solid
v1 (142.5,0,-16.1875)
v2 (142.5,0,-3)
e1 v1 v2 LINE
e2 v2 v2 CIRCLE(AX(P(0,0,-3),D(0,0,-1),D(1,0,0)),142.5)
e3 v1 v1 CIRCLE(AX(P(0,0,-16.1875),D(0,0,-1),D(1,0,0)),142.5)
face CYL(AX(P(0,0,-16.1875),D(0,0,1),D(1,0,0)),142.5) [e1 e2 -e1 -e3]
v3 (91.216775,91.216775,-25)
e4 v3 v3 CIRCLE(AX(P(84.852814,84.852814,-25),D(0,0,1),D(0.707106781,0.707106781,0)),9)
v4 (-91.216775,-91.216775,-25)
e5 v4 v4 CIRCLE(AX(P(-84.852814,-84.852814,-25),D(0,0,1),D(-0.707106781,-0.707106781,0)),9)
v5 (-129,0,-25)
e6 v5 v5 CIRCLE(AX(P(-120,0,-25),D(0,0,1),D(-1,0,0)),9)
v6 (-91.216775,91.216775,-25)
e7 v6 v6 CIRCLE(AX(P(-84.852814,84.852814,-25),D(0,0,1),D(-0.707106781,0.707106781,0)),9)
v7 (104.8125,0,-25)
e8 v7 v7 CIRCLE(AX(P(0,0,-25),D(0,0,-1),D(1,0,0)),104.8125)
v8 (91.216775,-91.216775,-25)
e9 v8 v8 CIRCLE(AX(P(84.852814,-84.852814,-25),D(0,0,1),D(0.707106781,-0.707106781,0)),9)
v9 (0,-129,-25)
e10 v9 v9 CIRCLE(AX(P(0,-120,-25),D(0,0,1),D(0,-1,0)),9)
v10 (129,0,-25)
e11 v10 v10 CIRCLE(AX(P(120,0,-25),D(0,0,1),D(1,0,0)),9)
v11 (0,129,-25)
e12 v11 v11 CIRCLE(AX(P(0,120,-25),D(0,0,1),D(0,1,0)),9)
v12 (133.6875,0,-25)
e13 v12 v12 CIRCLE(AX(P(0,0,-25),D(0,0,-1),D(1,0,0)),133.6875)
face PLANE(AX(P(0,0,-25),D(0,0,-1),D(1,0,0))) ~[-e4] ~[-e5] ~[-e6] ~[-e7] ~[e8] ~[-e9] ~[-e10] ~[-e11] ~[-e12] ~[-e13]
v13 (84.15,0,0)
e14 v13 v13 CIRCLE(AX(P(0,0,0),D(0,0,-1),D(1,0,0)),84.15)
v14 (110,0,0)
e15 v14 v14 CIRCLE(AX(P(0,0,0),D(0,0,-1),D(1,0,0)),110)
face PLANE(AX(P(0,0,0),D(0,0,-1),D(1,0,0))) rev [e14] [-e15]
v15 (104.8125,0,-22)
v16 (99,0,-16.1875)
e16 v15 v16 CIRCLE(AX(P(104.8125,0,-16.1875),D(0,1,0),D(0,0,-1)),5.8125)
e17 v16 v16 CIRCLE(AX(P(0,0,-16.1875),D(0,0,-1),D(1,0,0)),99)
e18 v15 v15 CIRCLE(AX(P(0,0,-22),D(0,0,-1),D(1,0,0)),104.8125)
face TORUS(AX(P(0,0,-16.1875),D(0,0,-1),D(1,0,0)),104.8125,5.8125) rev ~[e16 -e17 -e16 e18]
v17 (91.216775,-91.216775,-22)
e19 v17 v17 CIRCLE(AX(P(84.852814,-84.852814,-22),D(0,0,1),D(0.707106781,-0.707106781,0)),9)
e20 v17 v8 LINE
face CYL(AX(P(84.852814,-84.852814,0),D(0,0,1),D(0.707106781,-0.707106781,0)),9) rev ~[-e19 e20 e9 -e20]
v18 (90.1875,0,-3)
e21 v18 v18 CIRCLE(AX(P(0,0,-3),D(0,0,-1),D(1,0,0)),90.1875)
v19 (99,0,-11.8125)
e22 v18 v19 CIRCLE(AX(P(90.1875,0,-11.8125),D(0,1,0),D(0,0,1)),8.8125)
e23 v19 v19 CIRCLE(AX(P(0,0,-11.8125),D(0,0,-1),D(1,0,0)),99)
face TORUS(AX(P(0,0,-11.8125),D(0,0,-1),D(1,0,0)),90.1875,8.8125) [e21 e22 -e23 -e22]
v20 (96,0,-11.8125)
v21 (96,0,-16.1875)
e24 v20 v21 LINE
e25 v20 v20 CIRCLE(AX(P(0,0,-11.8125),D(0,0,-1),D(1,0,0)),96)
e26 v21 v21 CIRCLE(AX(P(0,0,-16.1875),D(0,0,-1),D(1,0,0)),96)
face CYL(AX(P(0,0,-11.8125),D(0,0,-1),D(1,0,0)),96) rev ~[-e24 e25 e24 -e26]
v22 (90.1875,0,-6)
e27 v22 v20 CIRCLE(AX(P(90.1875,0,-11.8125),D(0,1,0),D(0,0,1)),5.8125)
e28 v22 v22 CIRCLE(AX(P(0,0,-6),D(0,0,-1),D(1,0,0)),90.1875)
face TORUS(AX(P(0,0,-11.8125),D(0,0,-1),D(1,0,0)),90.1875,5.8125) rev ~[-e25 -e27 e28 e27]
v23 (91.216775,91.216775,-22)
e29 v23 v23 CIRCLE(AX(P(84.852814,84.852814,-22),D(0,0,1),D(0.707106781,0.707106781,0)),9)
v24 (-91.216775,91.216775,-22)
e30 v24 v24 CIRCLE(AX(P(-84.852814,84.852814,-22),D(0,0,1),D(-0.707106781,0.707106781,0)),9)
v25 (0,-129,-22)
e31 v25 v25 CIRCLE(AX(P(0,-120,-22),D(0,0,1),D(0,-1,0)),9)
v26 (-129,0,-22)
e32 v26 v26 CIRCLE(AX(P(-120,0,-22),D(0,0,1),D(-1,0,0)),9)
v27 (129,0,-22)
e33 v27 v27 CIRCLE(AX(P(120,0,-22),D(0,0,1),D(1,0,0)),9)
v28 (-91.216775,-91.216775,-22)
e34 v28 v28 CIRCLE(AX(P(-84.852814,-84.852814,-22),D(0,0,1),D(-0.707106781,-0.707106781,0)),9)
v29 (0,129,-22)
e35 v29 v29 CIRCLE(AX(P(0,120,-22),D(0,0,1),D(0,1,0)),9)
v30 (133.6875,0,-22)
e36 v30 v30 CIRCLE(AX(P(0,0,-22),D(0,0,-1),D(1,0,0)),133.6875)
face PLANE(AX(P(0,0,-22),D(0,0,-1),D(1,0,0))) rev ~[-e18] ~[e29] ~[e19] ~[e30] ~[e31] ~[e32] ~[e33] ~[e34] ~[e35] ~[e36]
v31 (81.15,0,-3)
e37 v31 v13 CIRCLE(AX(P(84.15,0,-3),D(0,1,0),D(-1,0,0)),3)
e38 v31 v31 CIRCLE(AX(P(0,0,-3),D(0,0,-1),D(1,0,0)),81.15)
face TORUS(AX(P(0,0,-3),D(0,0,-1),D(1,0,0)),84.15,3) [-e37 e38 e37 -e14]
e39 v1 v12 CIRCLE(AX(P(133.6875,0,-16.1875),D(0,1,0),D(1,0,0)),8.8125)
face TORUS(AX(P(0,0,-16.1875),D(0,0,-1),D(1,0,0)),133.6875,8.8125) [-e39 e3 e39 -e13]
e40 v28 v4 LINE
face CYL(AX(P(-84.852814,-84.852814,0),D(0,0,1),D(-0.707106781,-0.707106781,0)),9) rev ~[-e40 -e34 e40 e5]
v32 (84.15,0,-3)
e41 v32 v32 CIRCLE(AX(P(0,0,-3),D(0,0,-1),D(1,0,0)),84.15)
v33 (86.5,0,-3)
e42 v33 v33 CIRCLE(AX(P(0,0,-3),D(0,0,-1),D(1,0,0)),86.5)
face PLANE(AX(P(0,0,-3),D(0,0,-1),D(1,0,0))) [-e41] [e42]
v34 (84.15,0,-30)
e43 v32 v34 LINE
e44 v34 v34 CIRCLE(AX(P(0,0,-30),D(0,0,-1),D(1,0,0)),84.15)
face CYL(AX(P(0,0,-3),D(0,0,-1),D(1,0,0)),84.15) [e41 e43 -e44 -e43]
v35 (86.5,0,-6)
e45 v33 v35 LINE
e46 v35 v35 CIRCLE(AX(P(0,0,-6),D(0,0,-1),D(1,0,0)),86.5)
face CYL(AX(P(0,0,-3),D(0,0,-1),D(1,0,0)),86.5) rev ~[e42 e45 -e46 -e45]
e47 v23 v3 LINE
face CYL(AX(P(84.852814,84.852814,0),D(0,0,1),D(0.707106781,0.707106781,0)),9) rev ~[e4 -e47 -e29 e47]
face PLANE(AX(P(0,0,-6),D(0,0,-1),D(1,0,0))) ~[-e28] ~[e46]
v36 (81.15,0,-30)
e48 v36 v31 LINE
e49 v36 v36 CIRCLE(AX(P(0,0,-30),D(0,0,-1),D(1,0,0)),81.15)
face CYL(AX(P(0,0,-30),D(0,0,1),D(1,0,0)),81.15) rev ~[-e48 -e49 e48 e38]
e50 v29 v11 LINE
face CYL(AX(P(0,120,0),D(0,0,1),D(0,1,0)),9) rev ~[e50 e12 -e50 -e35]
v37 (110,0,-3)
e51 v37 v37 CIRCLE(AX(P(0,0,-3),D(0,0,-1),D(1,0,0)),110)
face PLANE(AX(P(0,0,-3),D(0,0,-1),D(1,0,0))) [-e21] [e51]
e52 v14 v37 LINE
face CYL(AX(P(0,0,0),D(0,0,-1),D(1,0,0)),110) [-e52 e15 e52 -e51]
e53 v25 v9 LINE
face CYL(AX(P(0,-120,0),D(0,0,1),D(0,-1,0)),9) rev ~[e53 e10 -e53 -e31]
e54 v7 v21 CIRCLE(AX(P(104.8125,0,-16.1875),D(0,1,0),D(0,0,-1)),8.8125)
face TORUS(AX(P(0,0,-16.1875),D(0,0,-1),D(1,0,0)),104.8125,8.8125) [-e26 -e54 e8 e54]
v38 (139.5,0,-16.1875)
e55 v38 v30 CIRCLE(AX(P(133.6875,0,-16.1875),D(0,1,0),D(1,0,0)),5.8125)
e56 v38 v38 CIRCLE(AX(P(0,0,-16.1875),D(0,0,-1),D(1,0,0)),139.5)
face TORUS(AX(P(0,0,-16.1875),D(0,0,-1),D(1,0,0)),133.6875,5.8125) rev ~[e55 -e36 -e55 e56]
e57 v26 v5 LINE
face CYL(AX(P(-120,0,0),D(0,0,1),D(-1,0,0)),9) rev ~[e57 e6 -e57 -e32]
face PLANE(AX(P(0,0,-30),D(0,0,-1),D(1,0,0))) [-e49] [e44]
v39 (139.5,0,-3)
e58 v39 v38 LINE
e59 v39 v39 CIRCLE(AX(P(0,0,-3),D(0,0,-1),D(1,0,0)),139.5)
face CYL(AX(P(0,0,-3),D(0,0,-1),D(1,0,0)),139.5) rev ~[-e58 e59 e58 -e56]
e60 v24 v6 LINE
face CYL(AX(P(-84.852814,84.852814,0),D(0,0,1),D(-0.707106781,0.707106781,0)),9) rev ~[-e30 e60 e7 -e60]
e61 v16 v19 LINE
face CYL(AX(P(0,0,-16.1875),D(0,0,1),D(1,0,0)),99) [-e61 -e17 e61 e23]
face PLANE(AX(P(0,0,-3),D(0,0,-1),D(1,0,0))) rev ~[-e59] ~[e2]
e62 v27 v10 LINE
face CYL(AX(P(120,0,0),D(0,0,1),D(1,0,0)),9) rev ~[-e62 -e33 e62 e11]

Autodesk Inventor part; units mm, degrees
ref_plane "YZ Plane" through (0, 0, 0) normal (1, 0, 0) x (0, 1, 0)
ref_plane "XZ Plane" through (0, 0, 0) normal (0, 1, 0) x (-1, 0, 0)
ref_plane "XY Plane" through (0, 0, 0) normal (0, 0, 1) x (1, 0, 0)
sketch "Sketch1" plane through (0, 0, 0) normal (0, 1, 0) x (-1, 0, 0)
  line L0 (0, 0) -> (0, -45.85397)
  line L1 (-110, 0) -> (-84.15, 0)
  arc A0 (-81.15, -3) -> (-84.15, 0) centre (-84.15, -3) ccw
  line L2 (-81.15, -3) -> (-81.15, -30)
  line L3 (-81.15, -30) -> (-84.15, -30)
  line L4 (-84.15, -30) -> (-84.15, -3)
  arc A1 (-84.15, -3) -> (-84.15, -3) centre (-84.15, -3) ccw
  line L5 (-84.15, -3) -> (-110, -3)
  line L6 (-110, -3) -> (-110, 0)
  point P0 (-97.075, 0)
  dimension "H_cllr" = 30
  dimension "D_ext_tube" = 168.3
  dimension "D_ext_clllr" = 220
  dimension "d26" = 3
sketch "Sketch1 outline for Revolution1" plane through (0, 0, 0) normal (0, 1, 0) x (-1, 0, 0)
  arc A0 (-81.15, -3) -> (-84.15, 0) centre (-84.15, -3) ccw
  line L0 (-81.15, -30) -> (-81.15, -3)
  line L1 (-84.15, -30) -> (-81.15, -30)
  line L2 (-84.15, -3) -> (-84.15, -30)
  line L3 (-110, -3) -> (-84.15, -3)
  line L4 (-110, 0) -> (-110, -3)
  line L5 (-84.15, 0) -> (-110, 0)
revolve "Revolution1" add sketch "Sketch1 outline for Revolution1" angle 360 about axis through (0, 0, 0) along (0, 0, -1)
sketch "Sketch2" plane through (0, 0, 0) normal (0, 1, 0) x (-1, 0, 0)
  line L0 (0, 0) -> (0, -50.951284)
  line L1 (-86.5, -6) -> (-90.1875, -6)
  arc A0 (-90.1875, -6) -> (-96, -11.8125) centre (-90.1875, -11.8125) ccw
  line L2 (-96, -11.8125) -> (-96, -16.1875)
  arc A1 (-104.8125, -25) -> (-96, -16.1875) centre (-104.8125, -16.1875) ccw
  line L3 (-104.8125, -25) -> (-133.6875, -25)
  arc A2 (-142.5, -16.1875) -> (-133.6875, -25) centre (-133.6875, -16.1875) ccw
  line L4 (-142.5, -16.1875) -> (-142.5, -3)
  line L5 (-142.5, -3) -> (-139.5, -3)
  line L6 (-139.5, -3) -> (-139.5, -16.1875)
  arc A3 (-139.5, -16.1875) -> (-133.6875, -22) centre (-133.6875, -16.1875) ccw
  line L7 (-133.6875, -22) -> (-104.8125, -22)
  arc A4 (-104.8125, -22) -> (-99, -16.1875) centre (-104.8125, -16.1875) ccw
  line L8 (-99, -16.1875) -> (-99, -11.8125)
  arc A5 (-90.1875, -3) -> (-99, -11.8125) centre (-90.1875, -11.8125) ccw
  line L9 (-90.1875, -3) -> (-86.5, -3)
  line L10 (-86.5, -3) -> (-86.5, -6)
  point P0 (-141, -3)
  point P1 (-88.34375, -3)
  dimension "d8" = 3
  dimension "Thknss_lpd" = 3
  dimension "d10" = 5.8125
  dimension "H_lpd" = 22
  dimension "D_ext_lpd" = 285
  dimension "d_inn_lpd" = 173
  dimension "d2_inn_lpd" = 192
  dimension "d23" = 46.5
revolve "Revolution2" add sketch "Sketch2" angle 360 about axis through (0, 0, 0) along (0, 0, -1)
sketch "Sketch3" plane through (0, 0, 0) normal (0, 0, 1) x (1, 0, 0)
  circle A0 centre (120, 0) radius 9
  line L0 (0, 0) -> (0, 123.830608)
  dimension "hl_d" = 18
  dimension "D_hl_c" = 240
extrude "Extrusion1" cut sketch "Sketch3" against normal through all
pattern_circular "Circular Pattern1" count 8 over 360 about axis through (0, 0, -10) along (0, 0, 1) of "Extrusion1"
equation "\"d26\" = Thknss_lpd"
equation "\"d8\" = Thknss_cllr"
equation "\"d10\" = 0.125 * d23"
equation "\"Thknss_cllr\" = 3"
properties part number "Stamp flange DIN2642-150" material "Stainless Steel"
